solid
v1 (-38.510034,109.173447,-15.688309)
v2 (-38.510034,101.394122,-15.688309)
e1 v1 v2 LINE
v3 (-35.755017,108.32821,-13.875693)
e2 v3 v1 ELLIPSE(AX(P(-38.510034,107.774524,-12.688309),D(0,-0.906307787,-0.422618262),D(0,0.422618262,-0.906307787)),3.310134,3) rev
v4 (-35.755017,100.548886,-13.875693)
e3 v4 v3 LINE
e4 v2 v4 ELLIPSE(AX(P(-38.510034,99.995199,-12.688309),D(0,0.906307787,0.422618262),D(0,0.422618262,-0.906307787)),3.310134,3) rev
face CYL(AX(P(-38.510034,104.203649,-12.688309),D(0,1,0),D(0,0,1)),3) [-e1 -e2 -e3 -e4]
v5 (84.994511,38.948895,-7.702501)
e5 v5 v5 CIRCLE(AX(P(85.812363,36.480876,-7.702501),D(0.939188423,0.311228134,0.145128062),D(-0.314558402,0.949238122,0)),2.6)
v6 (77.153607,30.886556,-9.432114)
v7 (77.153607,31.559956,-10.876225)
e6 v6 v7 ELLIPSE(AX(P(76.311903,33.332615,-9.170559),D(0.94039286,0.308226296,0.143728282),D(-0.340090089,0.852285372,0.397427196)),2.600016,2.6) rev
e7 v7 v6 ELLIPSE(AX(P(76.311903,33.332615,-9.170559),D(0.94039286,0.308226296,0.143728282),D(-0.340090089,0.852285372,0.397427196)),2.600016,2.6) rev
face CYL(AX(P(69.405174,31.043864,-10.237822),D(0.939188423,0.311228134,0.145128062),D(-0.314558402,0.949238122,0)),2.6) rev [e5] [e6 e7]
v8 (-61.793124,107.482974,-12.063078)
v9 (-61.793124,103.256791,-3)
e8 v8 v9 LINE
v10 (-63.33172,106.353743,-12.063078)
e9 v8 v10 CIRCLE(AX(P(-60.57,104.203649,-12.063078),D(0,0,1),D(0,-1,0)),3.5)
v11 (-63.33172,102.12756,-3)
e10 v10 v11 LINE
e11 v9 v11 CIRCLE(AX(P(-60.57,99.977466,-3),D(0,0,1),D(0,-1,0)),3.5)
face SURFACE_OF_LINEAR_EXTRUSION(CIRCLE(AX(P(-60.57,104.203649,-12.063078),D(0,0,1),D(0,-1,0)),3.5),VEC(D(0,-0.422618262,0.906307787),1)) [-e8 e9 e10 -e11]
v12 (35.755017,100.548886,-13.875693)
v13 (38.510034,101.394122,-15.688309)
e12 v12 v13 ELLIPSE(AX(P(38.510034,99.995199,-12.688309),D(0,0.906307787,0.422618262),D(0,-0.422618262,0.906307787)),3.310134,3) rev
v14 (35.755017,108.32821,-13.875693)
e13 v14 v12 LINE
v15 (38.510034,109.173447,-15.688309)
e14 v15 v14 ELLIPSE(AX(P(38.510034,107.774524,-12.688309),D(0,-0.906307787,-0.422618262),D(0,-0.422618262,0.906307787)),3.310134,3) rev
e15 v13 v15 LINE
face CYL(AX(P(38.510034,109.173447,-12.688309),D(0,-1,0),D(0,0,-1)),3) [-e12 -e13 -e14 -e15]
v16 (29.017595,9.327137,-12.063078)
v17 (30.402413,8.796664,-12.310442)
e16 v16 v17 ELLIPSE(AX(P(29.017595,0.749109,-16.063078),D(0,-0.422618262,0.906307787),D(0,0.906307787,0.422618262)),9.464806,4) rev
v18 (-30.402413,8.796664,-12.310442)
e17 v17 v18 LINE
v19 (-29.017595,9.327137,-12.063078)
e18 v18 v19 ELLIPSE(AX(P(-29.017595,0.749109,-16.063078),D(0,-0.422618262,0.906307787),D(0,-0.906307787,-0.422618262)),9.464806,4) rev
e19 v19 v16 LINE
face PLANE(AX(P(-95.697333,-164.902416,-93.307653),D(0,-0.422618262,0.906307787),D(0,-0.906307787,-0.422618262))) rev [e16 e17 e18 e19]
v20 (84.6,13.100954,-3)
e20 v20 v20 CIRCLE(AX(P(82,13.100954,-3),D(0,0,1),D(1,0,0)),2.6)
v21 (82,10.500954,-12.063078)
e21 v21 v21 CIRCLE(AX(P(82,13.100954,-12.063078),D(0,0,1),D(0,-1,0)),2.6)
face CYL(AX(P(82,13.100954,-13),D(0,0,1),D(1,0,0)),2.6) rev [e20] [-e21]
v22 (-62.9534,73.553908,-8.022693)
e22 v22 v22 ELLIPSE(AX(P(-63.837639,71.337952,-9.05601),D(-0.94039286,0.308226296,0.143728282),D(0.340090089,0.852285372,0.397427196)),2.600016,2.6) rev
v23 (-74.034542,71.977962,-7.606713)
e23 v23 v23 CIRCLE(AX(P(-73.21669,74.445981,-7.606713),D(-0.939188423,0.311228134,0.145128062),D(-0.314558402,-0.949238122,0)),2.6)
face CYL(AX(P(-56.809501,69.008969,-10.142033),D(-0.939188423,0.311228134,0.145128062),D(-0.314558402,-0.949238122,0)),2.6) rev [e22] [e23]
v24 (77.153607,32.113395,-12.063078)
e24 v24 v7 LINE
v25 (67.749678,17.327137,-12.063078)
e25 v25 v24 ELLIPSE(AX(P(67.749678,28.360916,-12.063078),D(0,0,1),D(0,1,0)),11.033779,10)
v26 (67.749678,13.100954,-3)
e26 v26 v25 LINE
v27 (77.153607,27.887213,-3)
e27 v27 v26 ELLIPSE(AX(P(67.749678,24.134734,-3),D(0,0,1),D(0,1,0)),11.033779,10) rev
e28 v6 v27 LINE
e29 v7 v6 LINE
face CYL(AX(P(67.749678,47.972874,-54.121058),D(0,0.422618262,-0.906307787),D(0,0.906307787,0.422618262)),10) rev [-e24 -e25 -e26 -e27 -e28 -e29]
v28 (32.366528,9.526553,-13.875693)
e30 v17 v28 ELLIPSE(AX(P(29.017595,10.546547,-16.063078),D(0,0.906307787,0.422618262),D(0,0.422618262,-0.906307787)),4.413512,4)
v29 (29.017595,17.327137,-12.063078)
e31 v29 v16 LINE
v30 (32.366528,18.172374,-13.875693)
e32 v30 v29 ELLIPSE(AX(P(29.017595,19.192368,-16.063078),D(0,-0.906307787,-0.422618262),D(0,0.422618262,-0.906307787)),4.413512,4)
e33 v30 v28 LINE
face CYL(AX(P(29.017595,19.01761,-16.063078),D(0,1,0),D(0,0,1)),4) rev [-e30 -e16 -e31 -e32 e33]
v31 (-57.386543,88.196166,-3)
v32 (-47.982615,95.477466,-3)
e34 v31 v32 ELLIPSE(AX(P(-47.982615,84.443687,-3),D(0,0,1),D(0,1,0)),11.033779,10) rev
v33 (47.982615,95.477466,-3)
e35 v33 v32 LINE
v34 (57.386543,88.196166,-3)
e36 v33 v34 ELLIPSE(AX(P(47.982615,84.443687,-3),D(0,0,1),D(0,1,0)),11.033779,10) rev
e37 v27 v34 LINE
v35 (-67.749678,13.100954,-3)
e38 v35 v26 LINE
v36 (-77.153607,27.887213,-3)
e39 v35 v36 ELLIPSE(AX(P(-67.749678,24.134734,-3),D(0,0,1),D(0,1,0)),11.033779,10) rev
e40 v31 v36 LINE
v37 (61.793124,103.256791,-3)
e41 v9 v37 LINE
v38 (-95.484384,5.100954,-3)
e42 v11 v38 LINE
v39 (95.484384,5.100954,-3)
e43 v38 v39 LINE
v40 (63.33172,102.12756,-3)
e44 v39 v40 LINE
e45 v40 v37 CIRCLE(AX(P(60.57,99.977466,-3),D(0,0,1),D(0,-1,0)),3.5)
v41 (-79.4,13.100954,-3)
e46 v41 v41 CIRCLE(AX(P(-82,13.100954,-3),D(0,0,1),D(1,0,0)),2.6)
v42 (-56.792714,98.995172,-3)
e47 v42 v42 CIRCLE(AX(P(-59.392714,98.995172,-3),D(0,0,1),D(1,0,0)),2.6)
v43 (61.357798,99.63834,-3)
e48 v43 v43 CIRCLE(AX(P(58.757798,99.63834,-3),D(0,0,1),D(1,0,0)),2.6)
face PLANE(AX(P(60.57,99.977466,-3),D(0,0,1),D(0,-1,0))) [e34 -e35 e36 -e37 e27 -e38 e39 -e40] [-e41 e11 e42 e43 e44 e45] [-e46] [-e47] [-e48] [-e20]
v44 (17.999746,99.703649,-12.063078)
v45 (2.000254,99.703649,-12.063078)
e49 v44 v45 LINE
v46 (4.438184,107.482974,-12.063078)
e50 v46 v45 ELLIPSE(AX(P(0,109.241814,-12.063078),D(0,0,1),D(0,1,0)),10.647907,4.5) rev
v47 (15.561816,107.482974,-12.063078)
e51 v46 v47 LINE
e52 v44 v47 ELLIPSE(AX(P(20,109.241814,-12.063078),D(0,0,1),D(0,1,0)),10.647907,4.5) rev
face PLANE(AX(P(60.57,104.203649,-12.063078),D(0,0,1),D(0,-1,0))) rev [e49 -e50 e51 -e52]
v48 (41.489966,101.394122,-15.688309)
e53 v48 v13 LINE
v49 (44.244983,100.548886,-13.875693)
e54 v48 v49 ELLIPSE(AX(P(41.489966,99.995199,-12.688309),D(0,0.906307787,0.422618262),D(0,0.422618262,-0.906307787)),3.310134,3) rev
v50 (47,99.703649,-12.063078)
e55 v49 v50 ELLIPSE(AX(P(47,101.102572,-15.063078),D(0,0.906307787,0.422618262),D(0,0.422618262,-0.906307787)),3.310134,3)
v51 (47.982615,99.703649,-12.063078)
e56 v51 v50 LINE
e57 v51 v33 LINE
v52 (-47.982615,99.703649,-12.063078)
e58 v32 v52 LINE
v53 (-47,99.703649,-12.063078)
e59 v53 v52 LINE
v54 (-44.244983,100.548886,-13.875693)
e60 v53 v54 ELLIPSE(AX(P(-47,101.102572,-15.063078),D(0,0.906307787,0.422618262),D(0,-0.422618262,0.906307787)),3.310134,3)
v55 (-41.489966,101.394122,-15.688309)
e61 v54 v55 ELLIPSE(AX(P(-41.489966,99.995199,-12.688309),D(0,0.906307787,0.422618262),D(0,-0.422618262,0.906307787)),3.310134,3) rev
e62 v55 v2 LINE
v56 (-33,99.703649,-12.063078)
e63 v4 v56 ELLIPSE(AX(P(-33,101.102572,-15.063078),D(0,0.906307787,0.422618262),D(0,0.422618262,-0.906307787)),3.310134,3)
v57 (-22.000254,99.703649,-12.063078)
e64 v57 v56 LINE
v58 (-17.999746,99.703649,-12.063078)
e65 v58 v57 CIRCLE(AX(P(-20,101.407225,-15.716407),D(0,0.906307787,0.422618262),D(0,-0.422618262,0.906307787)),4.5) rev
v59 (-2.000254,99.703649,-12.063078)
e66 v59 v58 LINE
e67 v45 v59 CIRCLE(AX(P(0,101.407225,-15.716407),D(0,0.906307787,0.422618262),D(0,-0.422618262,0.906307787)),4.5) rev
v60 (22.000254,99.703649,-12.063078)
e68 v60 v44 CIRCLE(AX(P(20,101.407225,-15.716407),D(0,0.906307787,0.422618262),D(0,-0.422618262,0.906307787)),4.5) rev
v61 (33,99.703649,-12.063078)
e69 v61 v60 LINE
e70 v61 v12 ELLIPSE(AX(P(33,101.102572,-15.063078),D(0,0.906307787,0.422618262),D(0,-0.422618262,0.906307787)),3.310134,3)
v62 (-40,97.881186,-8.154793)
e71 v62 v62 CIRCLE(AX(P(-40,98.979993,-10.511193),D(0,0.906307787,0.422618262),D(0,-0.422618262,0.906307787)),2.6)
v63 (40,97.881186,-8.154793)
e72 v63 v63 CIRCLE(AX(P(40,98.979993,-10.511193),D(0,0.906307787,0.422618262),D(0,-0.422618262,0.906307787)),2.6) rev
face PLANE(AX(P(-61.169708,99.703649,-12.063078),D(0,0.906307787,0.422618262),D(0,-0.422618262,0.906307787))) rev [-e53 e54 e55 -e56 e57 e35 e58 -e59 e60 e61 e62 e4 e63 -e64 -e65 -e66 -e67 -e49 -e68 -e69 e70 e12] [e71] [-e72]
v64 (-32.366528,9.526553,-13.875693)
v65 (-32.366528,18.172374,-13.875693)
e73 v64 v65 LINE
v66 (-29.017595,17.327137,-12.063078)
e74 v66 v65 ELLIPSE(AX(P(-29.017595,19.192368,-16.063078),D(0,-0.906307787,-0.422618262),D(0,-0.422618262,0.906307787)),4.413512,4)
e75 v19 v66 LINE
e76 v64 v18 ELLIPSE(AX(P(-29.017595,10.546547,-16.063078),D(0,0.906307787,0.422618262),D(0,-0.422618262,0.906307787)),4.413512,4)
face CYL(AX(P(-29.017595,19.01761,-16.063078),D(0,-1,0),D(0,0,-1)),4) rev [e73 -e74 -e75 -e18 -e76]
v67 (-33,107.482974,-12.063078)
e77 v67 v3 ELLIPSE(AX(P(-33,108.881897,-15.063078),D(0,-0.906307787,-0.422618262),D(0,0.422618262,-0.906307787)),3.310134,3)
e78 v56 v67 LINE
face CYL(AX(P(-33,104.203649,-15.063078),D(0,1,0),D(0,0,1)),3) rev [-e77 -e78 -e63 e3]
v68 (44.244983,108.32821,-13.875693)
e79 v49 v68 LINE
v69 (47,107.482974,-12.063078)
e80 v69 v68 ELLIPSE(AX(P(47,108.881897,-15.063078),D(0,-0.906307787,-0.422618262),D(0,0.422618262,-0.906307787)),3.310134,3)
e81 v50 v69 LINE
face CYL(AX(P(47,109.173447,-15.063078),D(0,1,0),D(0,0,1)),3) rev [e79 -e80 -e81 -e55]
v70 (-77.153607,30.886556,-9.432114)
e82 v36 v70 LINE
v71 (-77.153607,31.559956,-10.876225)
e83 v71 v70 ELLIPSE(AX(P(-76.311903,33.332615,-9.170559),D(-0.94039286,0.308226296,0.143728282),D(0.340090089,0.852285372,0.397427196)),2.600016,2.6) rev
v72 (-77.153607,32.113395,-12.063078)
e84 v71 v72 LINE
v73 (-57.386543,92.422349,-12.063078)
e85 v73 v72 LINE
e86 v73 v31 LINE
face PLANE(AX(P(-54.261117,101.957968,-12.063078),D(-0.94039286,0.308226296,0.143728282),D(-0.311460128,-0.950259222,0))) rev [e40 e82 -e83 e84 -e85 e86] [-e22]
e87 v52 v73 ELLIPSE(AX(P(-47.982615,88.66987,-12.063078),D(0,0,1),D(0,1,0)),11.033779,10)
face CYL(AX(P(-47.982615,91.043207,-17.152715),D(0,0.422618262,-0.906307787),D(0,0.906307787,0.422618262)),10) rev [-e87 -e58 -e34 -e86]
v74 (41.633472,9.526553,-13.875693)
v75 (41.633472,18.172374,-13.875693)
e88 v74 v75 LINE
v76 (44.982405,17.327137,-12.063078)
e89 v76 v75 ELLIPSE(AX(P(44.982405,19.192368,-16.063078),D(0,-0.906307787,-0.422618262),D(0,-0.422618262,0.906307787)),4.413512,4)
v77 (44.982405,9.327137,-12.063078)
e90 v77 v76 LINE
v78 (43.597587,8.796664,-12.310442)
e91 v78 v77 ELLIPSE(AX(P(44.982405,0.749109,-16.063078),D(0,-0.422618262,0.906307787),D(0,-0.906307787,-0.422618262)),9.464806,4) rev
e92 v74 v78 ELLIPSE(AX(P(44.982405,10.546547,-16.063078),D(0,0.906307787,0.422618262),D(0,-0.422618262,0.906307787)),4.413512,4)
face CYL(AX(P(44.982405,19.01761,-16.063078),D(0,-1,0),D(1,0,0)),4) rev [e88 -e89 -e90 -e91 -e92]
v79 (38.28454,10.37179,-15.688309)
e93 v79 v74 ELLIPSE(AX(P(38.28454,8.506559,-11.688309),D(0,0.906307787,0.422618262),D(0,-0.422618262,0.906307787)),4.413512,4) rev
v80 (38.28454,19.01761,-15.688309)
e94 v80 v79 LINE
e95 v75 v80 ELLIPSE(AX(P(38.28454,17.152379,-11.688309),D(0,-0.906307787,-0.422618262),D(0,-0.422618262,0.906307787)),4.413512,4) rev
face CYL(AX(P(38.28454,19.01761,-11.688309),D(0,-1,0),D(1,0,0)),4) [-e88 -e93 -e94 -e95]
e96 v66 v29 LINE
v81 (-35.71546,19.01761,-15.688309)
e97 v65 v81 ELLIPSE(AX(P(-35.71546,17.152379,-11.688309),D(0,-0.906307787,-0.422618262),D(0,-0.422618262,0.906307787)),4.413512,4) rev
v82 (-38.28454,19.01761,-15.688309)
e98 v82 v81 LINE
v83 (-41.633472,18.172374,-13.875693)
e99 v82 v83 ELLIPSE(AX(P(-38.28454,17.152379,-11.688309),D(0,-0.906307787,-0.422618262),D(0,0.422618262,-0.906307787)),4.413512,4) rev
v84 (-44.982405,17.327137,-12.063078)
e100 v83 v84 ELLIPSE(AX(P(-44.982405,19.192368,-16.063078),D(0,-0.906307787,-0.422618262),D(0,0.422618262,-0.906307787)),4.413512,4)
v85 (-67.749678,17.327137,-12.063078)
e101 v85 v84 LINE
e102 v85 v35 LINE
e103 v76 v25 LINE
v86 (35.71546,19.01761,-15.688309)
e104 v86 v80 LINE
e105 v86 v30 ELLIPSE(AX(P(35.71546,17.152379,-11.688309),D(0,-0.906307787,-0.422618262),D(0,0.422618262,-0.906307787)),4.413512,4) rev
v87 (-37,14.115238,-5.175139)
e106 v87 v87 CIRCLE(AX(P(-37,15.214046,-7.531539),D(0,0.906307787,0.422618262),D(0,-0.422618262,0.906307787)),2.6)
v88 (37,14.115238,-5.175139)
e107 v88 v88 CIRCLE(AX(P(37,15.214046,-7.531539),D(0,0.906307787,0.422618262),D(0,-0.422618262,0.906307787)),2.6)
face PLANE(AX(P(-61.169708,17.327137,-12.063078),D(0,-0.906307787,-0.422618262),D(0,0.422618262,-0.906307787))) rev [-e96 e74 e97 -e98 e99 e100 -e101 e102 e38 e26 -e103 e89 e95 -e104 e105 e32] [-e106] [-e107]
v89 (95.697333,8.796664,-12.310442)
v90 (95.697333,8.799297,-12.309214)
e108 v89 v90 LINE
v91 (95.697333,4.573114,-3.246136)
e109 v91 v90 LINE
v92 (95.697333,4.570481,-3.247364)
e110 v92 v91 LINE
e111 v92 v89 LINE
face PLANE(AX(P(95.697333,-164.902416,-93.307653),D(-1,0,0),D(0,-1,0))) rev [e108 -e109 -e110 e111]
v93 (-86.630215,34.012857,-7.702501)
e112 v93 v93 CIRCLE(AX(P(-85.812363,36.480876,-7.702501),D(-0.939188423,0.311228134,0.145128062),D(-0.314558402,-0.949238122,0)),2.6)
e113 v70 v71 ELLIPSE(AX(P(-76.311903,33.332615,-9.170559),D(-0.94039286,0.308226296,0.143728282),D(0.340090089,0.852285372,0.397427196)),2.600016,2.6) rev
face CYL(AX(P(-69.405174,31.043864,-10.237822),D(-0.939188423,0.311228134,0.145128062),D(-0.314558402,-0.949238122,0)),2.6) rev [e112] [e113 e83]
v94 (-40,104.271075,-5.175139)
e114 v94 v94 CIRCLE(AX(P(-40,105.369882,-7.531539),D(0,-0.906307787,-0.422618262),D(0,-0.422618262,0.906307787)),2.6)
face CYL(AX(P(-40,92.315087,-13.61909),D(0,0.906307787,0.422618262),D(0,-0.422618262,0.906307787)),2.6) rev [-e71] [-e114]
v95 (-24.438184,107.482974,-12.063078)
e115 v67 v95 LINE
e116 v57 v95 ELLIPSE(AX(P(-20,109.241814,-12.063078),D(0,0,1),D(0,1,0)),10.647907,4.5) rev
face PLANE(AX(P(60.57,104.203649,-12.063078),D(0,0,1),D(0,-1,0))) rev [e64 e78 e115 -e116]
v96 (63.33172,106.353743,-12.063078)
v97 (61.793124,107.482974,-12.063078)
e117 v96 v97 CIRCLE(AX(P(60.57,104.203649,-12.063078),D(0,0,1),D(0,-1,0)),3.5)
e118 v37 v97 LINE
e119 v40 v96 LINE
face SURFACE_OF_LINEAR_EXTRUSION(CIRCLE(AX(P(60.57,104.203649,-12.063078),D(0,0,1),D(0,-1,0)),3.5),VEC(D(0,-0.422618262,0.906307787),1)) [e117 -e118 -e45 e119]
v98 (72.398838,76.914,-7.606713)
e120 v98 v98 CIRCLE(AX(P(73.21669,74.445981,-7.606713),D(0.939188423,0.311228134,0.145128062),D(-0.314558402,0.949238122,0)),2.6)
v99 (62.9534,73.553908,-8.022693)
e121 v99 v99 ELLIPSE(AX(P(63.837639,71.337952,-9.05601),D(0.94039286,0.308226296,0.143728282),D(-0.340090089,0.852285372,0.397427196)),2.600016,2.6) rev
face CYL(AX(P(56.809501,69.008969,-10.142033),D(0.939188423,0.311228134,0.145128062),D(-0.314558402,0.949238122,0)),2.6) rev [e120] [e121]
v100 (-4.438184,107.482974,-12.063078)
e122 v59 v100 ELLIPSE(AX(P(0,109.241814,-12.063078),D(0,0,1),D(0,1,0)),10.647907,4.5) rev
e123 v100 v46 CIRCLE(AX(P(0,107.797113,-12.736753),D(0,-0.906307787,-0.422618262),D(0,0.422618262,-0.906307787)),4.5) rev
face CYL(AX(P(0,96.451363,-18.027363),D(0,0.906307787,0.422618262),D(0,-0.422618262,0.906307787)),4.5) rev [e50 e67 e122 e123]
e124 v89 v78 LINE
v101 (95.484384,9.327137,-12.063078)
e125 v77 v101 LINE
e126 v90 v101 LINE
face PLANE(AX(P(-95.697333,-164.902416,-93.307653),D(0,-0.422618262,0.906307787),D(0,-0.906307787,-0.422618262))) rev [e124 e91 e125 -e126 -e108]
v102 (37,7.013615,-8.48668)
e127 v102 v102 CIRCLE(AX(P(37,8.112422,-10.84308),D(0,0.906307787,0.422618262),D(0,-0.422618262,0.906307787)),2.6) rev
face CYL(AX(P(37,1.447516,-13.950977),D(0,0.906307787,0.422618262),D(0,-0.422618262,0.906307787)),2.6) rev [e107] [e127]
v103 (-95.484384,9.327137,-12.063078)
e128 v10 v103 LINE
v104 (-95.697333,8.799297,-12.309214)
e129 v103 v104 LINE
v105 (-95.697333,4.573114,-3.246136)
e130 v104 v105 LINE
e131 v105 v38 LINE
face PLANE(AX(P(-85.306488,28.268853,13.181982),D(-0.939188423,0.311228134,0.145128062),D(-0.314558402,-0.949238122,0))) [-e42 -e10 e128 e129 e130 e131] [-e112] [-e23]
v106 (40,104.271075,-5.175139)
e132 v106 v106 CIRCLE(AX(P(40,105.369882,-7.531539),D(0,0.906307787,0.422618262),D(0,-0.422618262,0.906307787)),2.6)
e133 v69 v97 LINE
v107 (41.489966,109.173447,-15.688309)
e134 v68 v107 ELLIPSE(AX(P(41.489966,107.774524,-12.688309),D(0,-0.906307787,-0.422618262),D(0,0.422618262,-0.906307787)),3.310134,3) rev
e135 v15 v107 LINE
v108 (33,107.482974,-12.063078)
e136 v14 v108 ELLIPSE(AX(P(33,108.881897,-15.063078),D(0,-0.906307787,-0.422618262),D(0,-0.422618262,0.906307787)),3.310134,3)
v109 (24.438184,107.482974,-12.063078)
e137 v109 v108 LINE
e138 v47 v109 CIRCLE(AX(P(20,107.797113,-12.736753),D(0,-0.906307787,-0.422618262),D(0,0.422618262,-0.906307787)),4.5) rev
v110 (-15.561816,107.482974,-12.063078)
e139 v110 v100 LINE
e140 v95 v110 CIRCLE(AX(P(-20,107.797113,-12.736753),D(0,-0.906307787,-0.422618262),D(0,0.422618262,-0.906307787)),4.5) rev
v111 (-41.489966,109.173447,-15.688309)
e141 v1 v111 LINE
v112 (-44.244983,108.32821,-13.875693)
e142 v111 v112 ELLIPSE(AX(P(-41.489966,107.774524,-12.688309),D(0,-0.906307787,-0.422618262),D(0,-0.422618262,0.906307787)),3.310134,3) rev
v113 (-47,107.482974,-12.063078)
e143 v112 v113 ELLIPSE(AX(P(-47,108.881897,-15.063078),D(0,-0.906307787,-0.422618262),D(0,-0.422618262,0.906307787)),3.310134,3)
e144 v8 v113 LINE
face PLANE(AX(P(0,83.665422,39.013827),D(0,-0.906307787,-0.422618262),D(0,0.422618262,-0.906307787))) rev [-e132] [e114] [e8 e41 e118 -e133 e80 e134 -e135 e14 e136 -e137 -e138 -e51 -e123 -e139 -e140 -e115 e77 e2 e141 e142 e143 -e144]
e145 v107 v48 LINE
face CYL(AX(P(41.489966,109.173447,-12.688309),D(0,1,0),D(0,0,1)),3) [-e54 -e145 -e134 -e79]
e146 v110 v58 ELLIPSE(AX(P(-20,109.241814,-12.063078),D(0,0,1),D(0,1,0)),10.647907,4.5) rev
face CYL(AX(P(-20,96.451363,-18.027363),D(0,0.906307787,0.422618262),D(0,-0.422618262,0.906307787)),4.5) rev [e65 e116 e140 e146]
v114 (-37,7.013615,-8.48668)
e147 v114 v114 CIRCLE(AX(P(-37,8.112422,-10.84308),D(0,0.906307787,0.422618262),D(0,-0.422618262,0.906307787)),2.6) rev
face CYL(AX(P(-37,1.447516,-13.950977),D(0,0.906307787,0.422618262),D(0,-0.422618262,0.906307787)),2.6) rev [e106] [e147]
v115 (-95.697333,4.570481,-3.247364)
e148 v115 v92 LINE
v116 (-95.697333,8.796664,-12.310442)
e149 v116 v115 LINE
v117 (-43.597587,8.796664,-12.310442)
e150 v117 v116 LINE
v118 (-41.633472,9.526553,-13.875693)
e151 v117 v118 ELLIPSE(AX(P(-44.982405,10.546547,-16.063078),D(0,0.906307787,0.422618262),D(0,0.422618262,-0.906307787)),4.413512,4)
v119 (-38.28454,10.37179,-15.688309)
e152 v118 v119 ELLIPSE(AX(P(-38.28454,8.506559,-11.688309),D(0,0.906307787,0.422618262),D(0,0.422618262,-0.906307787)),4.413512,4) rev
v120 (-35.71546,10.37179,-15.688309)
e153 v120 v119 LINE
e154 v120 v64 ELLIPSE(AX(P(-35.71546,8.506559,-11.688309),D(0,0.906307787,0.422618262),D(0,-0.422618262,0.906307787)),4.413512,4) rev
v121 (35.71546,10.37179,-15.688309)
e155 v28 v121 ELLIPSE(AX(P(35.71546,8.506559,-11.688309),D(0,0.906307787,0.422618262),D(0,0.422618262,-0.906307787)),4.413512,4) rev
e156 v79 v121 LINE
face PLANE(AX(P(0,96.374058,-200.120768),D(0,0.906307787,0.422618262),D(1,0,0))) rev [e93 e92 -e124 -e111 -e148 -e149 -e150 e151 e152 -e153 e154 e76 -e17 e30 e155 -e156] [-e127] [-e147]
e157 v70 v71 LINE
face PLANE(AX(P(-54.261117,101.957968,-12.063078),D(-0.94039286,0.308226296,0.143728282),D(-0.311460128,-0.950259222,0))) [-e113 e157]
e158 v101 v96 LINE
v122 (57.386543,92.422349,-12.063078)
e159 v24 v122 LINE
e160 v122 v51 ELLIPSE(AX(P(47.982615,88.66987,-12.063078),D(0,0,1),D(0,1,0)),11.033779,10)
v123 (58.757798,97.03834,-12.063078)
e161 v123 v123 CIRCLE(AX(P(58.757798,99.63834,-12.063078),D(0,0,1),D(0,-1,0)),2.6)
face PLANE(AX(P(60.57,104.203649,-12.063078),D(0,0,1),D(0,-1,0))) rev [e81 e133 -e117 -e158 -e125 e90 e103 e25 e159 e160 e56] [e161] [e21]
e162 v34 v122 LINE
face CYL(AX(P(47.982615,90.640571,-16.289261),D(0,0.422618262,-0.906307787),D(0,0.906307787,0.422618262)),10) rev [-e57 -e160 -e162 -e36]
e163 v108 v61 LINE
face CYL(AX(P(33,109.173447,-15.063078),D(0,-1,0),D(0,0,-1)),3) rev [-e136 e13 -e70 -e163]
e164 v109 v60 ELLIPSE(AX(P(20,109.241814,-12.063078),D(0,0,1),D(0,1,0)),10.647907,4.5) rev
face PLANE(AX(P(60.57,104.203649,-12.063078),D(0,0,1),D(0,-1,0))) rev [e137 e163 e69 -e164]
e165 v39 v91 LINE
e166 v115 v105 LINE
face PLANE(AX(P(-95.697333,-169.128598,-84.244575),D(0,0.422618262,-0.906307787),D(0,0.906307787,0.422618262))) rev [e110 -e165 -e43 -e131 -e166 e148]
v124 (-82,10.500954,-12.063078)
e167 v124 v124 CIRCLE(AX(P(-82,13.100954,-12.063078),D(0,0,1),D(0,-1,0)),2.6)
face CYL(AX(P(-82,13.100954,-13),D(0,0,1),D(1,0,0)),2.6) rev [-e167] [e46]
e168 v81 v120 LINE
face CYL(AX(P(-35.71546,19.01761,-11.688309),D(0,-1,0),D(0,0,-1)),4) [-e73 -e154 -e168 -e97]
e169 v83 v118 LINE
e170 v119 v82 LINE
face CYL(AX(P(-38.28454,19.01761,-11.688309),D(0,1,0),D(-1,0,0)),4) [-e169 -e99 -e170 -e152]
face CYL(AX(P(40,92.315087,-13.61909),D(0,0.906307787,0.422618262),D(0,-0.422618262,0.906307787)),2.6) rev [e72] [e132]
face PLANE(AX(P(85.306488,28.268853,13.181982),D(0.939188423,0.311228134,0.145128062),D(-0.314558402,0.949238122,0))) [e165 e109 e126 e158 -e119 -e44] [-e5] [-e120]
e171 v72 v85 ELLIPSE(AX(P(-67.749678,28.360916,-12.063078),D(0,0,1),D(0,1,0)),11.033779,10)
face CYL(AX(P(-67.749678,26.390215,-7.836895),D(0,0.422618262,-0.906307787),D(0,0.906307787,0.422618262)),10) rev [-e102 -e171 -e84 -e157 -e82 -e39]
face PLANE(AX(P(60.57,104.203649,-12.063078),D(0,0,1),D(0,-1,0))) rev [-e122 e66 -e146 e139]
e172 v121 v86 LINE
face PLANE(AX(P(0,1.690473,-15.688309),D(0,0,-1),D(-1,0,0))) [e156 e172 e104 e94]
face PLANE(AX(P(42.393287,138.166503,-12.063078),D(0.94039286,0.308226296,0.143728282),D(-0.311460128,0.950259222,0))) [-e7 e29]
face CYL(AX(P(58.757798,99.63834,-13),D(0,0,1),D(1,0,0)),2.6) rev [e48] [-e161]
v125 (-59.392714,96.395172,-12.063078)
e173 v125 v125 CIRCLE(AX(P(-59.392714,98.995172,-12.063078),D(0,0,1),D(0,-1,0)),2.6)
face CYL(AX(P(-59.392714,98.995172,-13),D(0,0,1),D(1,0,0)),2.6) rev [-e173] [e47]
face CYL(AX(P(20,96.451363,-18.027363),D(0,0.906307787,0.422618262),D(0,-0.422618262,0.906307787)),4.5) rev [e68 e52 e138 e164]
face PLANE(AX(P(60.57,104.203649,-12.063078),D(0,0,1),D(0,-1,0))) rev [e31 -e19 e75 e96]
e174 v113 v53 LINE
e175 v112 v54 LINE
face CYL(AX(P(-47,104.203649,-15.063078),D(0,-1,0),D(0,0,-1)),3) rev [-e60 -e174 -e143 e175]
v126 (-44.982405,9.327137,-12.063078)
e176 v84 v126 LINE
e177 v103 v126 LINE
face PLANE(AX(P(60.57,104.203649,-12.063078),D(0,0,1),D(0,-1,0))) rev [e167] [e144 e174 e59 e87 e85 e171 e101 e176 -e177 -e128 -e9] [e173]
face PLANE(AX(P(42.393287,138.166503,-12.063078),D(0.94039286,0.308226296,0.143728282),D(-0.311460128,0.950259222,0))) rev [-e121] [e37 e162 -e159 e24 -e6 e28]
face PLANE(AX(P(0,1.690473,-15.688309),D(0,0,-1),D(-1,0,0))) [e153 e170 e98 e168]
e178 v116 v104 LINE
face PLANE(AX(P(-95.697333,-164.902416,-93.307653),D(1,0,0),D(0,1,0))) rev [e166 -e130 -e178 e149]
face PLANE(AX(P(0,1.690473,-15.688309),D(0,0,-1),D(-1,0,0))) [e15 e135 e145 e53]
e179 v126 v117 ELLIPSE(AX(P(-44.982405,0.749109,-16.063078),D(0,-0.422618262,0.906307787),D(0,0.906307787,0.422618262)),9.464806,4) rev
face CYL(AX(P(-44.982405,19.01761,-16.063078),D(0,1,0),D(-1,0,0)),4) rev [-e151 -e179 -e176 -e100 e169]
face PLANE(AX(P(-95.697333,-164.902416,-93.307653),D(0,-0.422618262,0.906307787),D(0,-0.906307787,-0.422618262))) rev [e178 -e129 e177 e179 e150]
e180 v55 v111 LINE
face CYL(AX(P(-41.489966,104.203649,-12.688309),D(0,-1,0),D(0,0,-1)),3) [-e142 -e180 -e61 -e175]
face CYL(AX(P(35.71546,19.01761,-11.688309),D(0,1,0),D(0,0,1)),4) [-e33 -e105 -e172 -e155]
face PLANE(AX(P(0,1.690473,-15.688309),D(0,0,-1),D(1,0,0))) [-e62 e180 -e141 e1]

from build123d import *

# Parameters (mm, degrees)
BOSS_EXTRUDE1_START       = 4.874679861
BOSS_EXTRUDE1_DEPTH       = 51.575710535
BOSS_EXTRUDE1_START_2     = -3.000000017
BOSS_EXTRUDE1_2_OUTLINE_W = 194
BOSS_EXTRUDE1_2_OUTLINE_H = 105
BOSS_EXTRUDE1_2_DEPTH     = 39.000000017
BOSS_EXTRUDE1_START_3     = -51
BOSS_EXTRUDE1_3_OUTLINE_W = 194
BOSS_EXTRUDE1_3_OUTLINE_H = 105
BOSS_EXTRUDE1_3_DEPTH     = 38.936922113
FILLET1_R                 = 10
FILLET2_R                 = 10
FILLET3_R                 = 10
SKETCH3_W                 = 191.394666852
SKETCH3_H                 = 10
BOSS_EXTRUDE2_DEPTH       = 0.585312203
SKETCH4_R                 = 2.6
CUT_EXTRUDE1_DEPTH        = 10
SKETCH7_W                 = 76.681603499
SKETCH7_H                 = 120.522510291
CUT_EXTRUDE3_DEPTH        = 0.2
SKETCH8_W                 = 50.495719576
SKETCH8_H                 = 179.215252444
CUT_EXTRUDE4_DEPTH        = 0.2
SKETCH9_W                 = 172.346517838
SKETCH9_H                 = 32.794681532
CUT_EXTRUDE5_DEPTH        = 0.2
BOSS_EXTRUDE4_START       = -41
BOSS_EXTRUDE4_DEPTH       = 8
BOSS_EXTRUDE4_START_2     = 33
BOSS_EXTRUDE4_2_DEPTH     = 8
BOSS_EXTRUDE6_REACH       = 146.47
SKETCH23_W                = 8
SKETCH23_H                = 6.447128672
SKETCH23_H_2              = 7.052174758
SKETCH25_W                = 94.886099326
SKETCH25_H                = 16.143412247
CUT_EXTRUDE11_DEPTH       = 20
FILLET5_R                 = 4
FILLET7_R                 = 4
SKETCH10_R                = 2.599999996
CUT_EXTRUDE7_DEPTH        = 7.8357745
CUT_EXTRUDE8_REACH        = 201.677
SKETCH12_R                = 2.600000006
CUT_EXTRUDE9_REACH        = 201.677
SKETCH13_R                = 2.599999994
BOSS_EXTRUDE5_START       = 36
BOSS_EXTRUDE5_DEPTH       = 8
FILLET9_R                 = 3
FILLET10_R                = 3
SKETCH15_R                = 2.599999996
CUT_EXTRUDE10_DEPTH       = 7.050462296
FILLET9_OF_MIRROR2_R      = 3
FILLET10_OF_MIRROR2_R     = 3
FILLET11_R                = 4
SKETCH26_R                = 4.5
CUT_EXTRUDE12_DEPTH       = 15


with BuildPart() as part:
    # Boss-Extrude1: read off the stored shape, not the designer's step
    # Boss-Extrude1 outline → Boss-Extrude1 (new body)
    with BuildSketch(Plane(origin=(0, 0, 0), x_dir=(1, 0, 0), z_dir=(0, 0.4226182617407039, -0.9063077870366479)).offset(BOSS_EXTRUDE1_START)):
        with BuildLine():
            Line((95.697333426, -3.355179907), (-95.697333426, -3.355179907))
            Line((-95.697333426, -3.355179907), (-63.892333426, -90.340305173))
            add(Edge.make_bspline(
                [(-60.57, -92.514578876), (-63.097338019, -92.514578876), (-63.892333426, -90.340305173)],
                knots=[3.141592654, 3.141592654, 3.141592654, 4.392397576, 4.392397576, 4.392397576], degree=2, weights=[1, 0.810727575, 1]))
            Line((-60.57, -92.514578876), (60.57, -92.514578876))
            add(Edge.make_bspline(
                [(63.892333426, -90.340305173), (63.097338019, -92.514578876), (60.57, -92.514578876)],
                knots=[1.890787732, 1.890787732, 1.890787732, 3.141592654, 3.141592654, 3.141592654], degree=2, weights=[1, 0.810727575, 1]))
            Line((63.892333426, -90.340305173), (95.697333426, -3.355179907))
        make_face()
        Polygon((55, -85.26411658), (-55, -85.26411658), (-82, -10.605642204), (82, -10.605642204), align=None, mode=Mode.SUBTRACT)
    extrude(amount=BOSS_EXTRUDE1_DEPTH)

    # Boss-Extrude1 2 outline → Boss-Extrude1 2 (cut)
    with BuildSketch(Plane.XY.offset(BOSS_EXTRUDE1_START_2)):
        with Locations((0, 56.5)):
            Rectangle(BOSS_EXTRUDE1_2_OUTLINE_W, BOSS_EXTRUDE1_2_OUTLINE_H)
    extrude(amount=BOSS_EXTRUDE1_2_DEPTH, mode=Mode.SUBTRACT)

    # Boss-Extrude1 3 outline → Boss-Extrude1 3 (cut)
    with BuildSketch(Plane.XY.offset(BOSS_EXTRUDE1_START_3)):
        with Locations((0, 56.5)):
            Rectangle(BOSS_EXTRUDE1_3_OUTLINE_W, BOSS_EXTRUDE1_3_OUTLINE_H)
    extrude(amount=BOSS_EXTRUDE1_3_DEPTH, mode=Mode.SUBTRACT)

    # Fillet1
    fillet1_edges = [part.edges().sort_by_distance(p)[0] for p in [
        (82, 15.214045715, -7.531538952),
    ]]
    fillet(fillet1_edges, radius=FILLET1_R)

    # Fillet2
    fillet2_edges = [part.edges().sort_by_distance(p)[0] for p in [
        (-55, 97.590557805, -7.531538952),
        (-82, 15.214045715, -7.531538952),
    ]]
    fillet(fillet2_edges, radius=FILLET2_R)

    # Fillet3
    fillet3_edges = [part.edges().sort_by_distance(p)[0] for p in [
        (55, 97.590557805, -7.531538952),
    ]]
    fillet(fillet3_edges, radius=FILLET3_R)

    # Sketch3 → Boss-Extrude2 (add)
    with BuildSketch(Plane(origin=(0, 3.040825677, 1.4179603), x_dir=(1, 0, 0), z_dir=(-1.1200309043401983e-15, -0.906307787036648, -0.4226182617407039))):
        with Locations((0, -9.874679861)):
            Rectangle(SKETCH3_W, SKETCH3_H)
    extrude(amount=BOSS_EXTRUDE2_DEPTH)

    # Sketch4 → Cut-Extrude1 (cut)
    with BuildSketch(Plane.XY.offset(-3.000000017)):
        with Locations((82, 13.100954406)):
            Circle(SKETCH4_R)
        with Locations((-82, 13.100954406)):
            Circle(SKETCH4_R)
        with Locations((-59.392713729, 98.995171517)):
            Circle(SKETCH4_R)
        with Locations((58.757797989, 99.638339714)):
            Circle(SKETCH4_R)
    extrude(amount=-CUT_EXTRUDE1_DEPTH, mode=Mode.SUBTRACT)

    # Sketch7 → Cut-Extrude3 (cut)
    with BuildSketch(Plane(origin=(85.494325927, 28.331098282, 13.211008093), x_dir=(0.13776108927123742, 0.04565125132212272, -0.9894128792043928), z_dir=(0.9391884231490254, 0.3112281339441758, 0.1451280622914585))):
        with Locations((19.482436939, 30.359211689)):
            Rectangle(SKETCH7_W, SKETCH7_H)
    extrude(amount=-CUT_EXTRUDE3_DEPTH, mode=Mode.SUBTRACT)

    # Sketch8 → Cut-Extrude4 (cut)
    with BuildSketch(Plane(origin=(-85.494325927, 28.331098282, 13.211008093), x_dir=(0.13776108927124237, -0.045651251322124685, 0.9894128792043921), z_dir=(-0.9391884231490236, 0.3112281339441788, 0.14512806229146383))):
        with Locations((-21.244190838, 22.680558739)):
            Rectangle(SKETCH8_W, SKETCH8_H)
    extrude(amount=-CUT_EXTRUDE4_DEPTH, mode=Mode.SUBTRACT)

    # Sketch9 → Cut-Extrude5 (cut)
    with BuildSketch(Plane(origin=(0, 83.84668325, 39.09835051), x_dir=(1, 0, 0), z_dir=(1.1810911620941561e-15, 0.906307787036648, 0.4226182617407039))):
        with Locations((2.693251026, 51.915992053)):
            Rectangle(SKETCH9_W, SKETCH9_H)
    extrude(amount=-CUT_EXTRUDE5_DEPTH, mode=Mode.SUBTRACT)

    # Boss-Extrude4: read off the stored shape, not the designer's step
    # Boss-Extrude4 outline → Boss-Extrude4 (add)
    with BuildSketch(Plane.YZ.offset(BOSS_EXTRUDE4_START)):
        Polygon((9.327137023, -12.063077887), (11.01761007, -15.688309035), (19.01761007, -15.688309035), (17.327137023, -12.063077887), align=None)
    extrude(amount=BOSS_EXTRUDE4_DEPTH)

    # Boss-Extrude4 2 outline → Boss-Extrude4 2 (add)
    with BuildSketch(Plane.YZ.offset(BOSS_EXTRUDE4_START_2)):
        Polygon((9.327137023, -12.063077887), (11.01761007, -15.688309035), (19.01761007, -15.688309035), (17.327137023, -12.063077887), align=None)
    extrude(amount=BOSS_EXTRUDE4_2_DEPTH)

    # Boss-Extrude6: up to this plane
    boss_extrude6_end = Plane(origin=(-95.697333426, -164.902415704, -93.307652601), z_dir=(0, -0.4226182617407038, 0.9063077870366479))
    # Sketch23 → Boss-Extrude6 (add, up to the surface)
    with BuildSketch(Plane(origin=(0, 0, -15.688309035), x_dir=(-1, 0, 0), z_dir=(0, 0, -1)), mode=Mode.PRIVATE) as boss_extrude6_sk1:
        with Locations((-37, 7.794045734)):
            Rectangle(SKETCH23_W, SKETCH23_H)
    boss_extrude6_tool1 = split(extrude(boss_extrude6_sk1.sketch, amount=-BOSS_EXTRUDE6_REACH, mode=Mode.PRIVATE), bisect_by=boss_extrude6_end, keep=Keep.BOTH, mode=Mode.PRIVATE)
    add(boss_extrude6_tool1.solids().sort_by_distance((37, 7.794046, -15.688309))[0])
    # Sketch23 → Boss-Extrude6 (add, up to the surface)
    with BuildSketch(Plane(origin=(0, 0, -15.688309035), x_dir=(-1, 0, 0), z_dir=(0, 0, -1)), mode=Mode.PRIVATE) as boss_extrude6_sk2:
        with Locations((37, 7.491522691)):
            Rectangle(SKETCH23_W, SKETCH23_H_2)
    boss_extrude6_tool2 = split(extrude(boss_extrude6_sk2.sketch, amount=-BOSS_EXTRUDE6_REACH, mode=Mode.PRIVATE), bisect_by=boss_extrude6_end, keep=Keep.BOTH, mode=Mode.PRIVATE)
    add(boss_extrude6_tool2.solids().sort_by_distance((-37, 7.491523, -15.688309))[0])

    # Sketch25 → Cut-Extrude11 (cut)
    with BuildSketch(Plane(origin=(0, 2.510352669, 1.170596674), x_dir=(1, 0, 0), z_dir=(-1.039808498602085e-15, -0.9063077870366479, -0.42261826174070405))):
        with Locations((2.401661721, -17.291874028)):
            Rectangle(SKETCH25_W, SKETCH25_H)
    extrude(amount=CUT_EXTRUDE11_DEPTH, mode=Mode.SUBTRACT)

    # Fillet5
    # the kernel refuses this fillet: 4 mm, written as the material it adds along each edge
    with BuildSketch(Plane(origin=(33, 27.283149122, -12.063077887), x_dir=(0, 0, -1), z_dir=(0, -1, 0))) as fillet5_piece_1_section:
        with BuildLine():
            CenterArc((4, -3.98240484), FILLET5_R, 95.376053402, 84.623946598)
            Line((0, -3.98240484), (0, 0))
            Line((0, 0), (3.625231148, 0))
        make_face()
    fillet5_piece_1 = extrude(amount=27.912024199, mode=Mode.PRIVATE)
    fillet5_piece_1 = split(fillet5_piece_1, bisect_by=Plane(origin=(33, 12.003719017, -19.187993157), z_dir=(1.1200309043401985e-15, 0.906307787036648, 0.4226182617407039)), keep=Keep.TOP, mode=Mode.PRIVATE)
    fillet5_piece_1 = split(fillet5_piece_1, bisect_by=Plane(origin=(33, 19.105342463, -15.876451759), z_dir=(0, -0.9063077870265417, -0.42261826176237693)), keep=Keep.TOP, mode=Mode.PRIVATE)
    add(fillet5_piece_1)

    # Fillet7
    # the kernel refuses this fillet: 4 mm, written as the material it adds along each edge
    with BuildSketch(Plane(origin=(-41, 27.283149122, -12.063077887), x_dir=(-1, 0, 0), z_dir=(0, -1, 0))) as fillet7_piece_1_section:
        with BuildLine():
            CenterArc((3.98240484, 4), FILLET7_R, 185.376053402, 84.623946598)
            Line((0, 3.625231148), (0, 0))
            Line((0, 0), (3.98240484, 0))
        make_face()
    fillet7_piece_1 = extrude(amount=27.912024199, mode=Mode.PRIVATE)
    fillet7_piece_1 = split(fillet7_piece_1, bisect_by=Plane(origin=(-41, 12.003719017, -19.187993157), z_dir=(0, 0.9063077870365974, 0.42261826174081224)), keep=Keep.TOP, mode=Mode.PRIVATE)
    fillet7_piece_1 = split(fillet7_piece_1, bisect_by=Plane(origin=(-41, 19.105342464, -15.876451759), z_dir=(0, -0.9063077870366479, -0.4226182617407039)), keep=Keep.TOP, mode=Mode.PRIVATE)
    add(fillet7_piece_1)
    with BuildSketch(Plane(origin=(-33, -0.628875076, -12.063077887), x_dir=(1, 0, 0), z_dir=(0, 1, 0))) as fillet7_piece_2_section:
        with BuildLine():
            CenterArc((3.98240484, 4), FILLET7_R, 185.376053402, 84.623946598)
            Line((0, 3.625231148), (0, 0))
            Line((0, 0), (3.98240484, 0))
        make_face()
    fillet7_piece_2 = extrude(amount=27.912024199, mode=Mode.PRIVATE)
    fillet7_piece_2 = split(fillet7_piece_2, bisect_by=Plane(origin=(-33, 7.018458576, -8.49706764), z_dir=(0, 0.9063077870365974, 0.42261826174081224)), keep=Keep.TOP, mode=Mode.PRIVATE)
    fillet7_piece_2 = split(fillet7_piece_2, bisect_by=Plane(origin=(-33, 14.120082023, -5.185526242), z_dir=(0, -0.9063077870366479, -0.4226182617407039)), keep=Keep.TOP, mode=Mode.PRIVATE)
    add(fillet7_piece_2)
    with BuildSketch(Plane(origin=(41, -0.628875076, -12.063077887), x_dir=(0, 0, -1), z_dir=(0, 1, 0))) as fillet7_piece_3_section:
        with BuildLine():
            CenterArc((4, -3.98240484), FILLET7_R, 95.376053402, 84.623946598)
            Line((0, -3.98240484), (0, 0))
            Line((0, 0), (3.625231148, 0))
        make_face()
    fillet7_piece_3 = extrude(amount=27.912024199, mode=Mode.PRIVATE)
    fillet7_piece_3 = split(fillet7_piece_3, bisect_by=Plane(origin=(41, 14.120082021, -5.185526242), z_dir=(0, -0.906307787026768, -0.4226182617618918)), keep=Keep.TOP, mode=Mode.PRIVATE)
    fillet7_piece_3 = split(fillet7_piece_3, bisect_by=Plane(origin=(41, 7.018458576, -8.49706764), z_dir=(0, 0.9063077870365974, 0.42261826174081224)), keep=Keep.TOP, mode=Mode.PRIVATE)
    add(fillet7_piece_3)

    # Sketch10 → Cut-Extrude7 (cut)
    with BuildSketch(Plane(origin=(0, 9.611976116, 4.482138073), x_dir=(1, 0, 0), z_dir=(0, 0.906307787036648, 0.4226182617407039))):
        with Locations(Location((37, 13.255625955, 0), (0, 0, 270))):
            Circle(SKETCH10_R)
        with Locations(Location((-37, 13.255625955, 0), (0, 0, 270))):
            Circle(SKETCH10_R)
    extrude(amount=-CUT_EXTRUDE7_DEPTH, mode=Mode.SUBTRACT)

    # Cut-Extrude8: up to this plane
    cut_extrude8_end = Plane(origin=(-54.261116971, 101.957967882, -12.063077887), z_dir=(-0.9403928599993537, 0.30822629625609715, 0.1437282823889735))
    # Sketch12 → Cut-Extrude8 (cut, up to the surface)
    with BuildSketch(Plane(origin=(-85.306488243, 28.268852655, 13.18198248), x_dir=(0.13776108927124261, -0.04565125132212473, 0.989412879204392), z_dir=(-0.9391884231490243, 0.3112281339441767, 0.14512806229146408)), mode=Mode.PRIVATE) as cut_extrude8_sk1:
        with Locations(Location((-21.011142762, 47.636038184, 0), (0, 0, 270))):
            Circle(SKETCH12_R)
    cut_extrude8_tool1 = split(extrude(cut_extrude8_sk1.sketch, amount=-CUT_EXTRUDE8_REACH, mode=Mode.PRIVATE), bisect_by=cut_extrude8_end, keep=Keep.BOTH, mode=Mode.PRIVATE)
    add(cut_extrude8_tool1.solids().sort_by_distance((-73.21669, 74.445981, -7.606713))[0], mode=Mode.SUBTRACT)
    # Sketch12 → Cut-Extrude8 (cut, up to the surface)
    with BuildSketch(Plane(origin=(-85.306488243, 28.268852655, 13.18198248), x_dir=(0.13776108927124261, -0.04565125132212473, 0.989412879204392), z_dir=(-0.9391884231490243, 0.3112281339441767, 0.14512806229146408)), mode=Mode.PRIVATE) as cut_extrude8_sk2:
        with Locations(Location((-21.107956078, 7.636038184, 0), (0, 0, 270))):
            Circle(SKETCH12_R)
    cut_extrude8_tool2 = split(extrude(cut_extrude8_sk2.sketch, amount=-CUT_EXTRUDE8_REACH, mode=Mode.PRIVATE), bisect_by=cut_extrude8_end, keep=Keep.BOTH, mode=Mode.PRIVATE)
    add(cut_extrude8_tool2.solids().sort_by_distance((-85.812363, 36.480876, -7.702501))[0], mode=Mode.SUBTRACT)

    # Cut-Extrude9: up to this plane
    cut_extrude9_end = Plane(origin=(42.393286839, 138.166503154, -12.063077887), z_dir=(0.9403928599993542, 0.308226296256098, 0.1437282823889695))
    # Sketch13 → Cut-Extrude9 (cut, up to the surface)
    with BuildSketch(Plane(origin=(85.306488243, 28.268852655, 13.18198248), x_dir=(0.1377610892712373, 0.045651251322122756, -0.989412879204393), z_dir=(0.9391884231490254, 0.3112281339441758, 0.1451280622914584)), mode=Mode.PRIVATE) as cut_extrude9_sk1:
        with Locations(Location((21.011142762, 47.636038184, 0), (0, 0, 90))):
            Circle(SKETCH13_R)
    cut_extrude9_tool1 = split(extrude(cut_extrude9_sk1.sketch, amount=-CUT_EXTRUDE9_REACH, mode=Mode.PRIVATE), bisect_by=cut_extrude9_end, keep=Keep.BOTH, mode=Mode.PRIVATE)
    add(cut_extrude9_tool1.solids().sort_by_distance((73.21669, 74.445981, -7.606713))[0], mode=Mode.SUBTRACT)
    # Sketch13 → Cut-Extrude9 (cut, up to the surface)
    with BuildSketch(Plane(origin=(85.306488243, 28.268852655, 13.18198248), x_dir=(0.1377610892712373, 0.045651251322122756, -0.989412879204393), z_dir=(0.9391884231490254, 0.3112281339441758, 0.1451280622914584)), mode=Mode.PRIVATE) as cut_extrude9_sk2:
        with Locations(Location((21.107956078, 7.636038184, 0), (0, 0, 90))):
            Circle(SKETCH13_R)
    cut_extrude9_tool2 = split(extrude(cut_extrude9_sk2.sketch, amount=-CUT_EXTRUDE9_REACH, mode=Mode.PRIVATE), bisect_by=cut_extrude9_end, keep=Keep.BOTH, mode=Mode.PRIVATE)
    add(cut_extrude9_tool2.solids().sort_by_distance((85.812363, 36.480876, -7.702501))[0], mode=Mode.SUBTRACT)

    # Boss-Extrude5: read off the stored shape, not the designer's step
    # Boss-Extrude5 outline → Boss-Extrude5 (add)
    with BuildSketch(Plane.YZ.offset(BOSS_EXTRUDE5_START)):
        Polygon((99.703649113, -12.063077887), (101.39412216, -15.688309035), (109.173446577, -15.688309035), (107.48297353, -12.063077887), align=None)
    boss_extrude5 = extrude(amount=BOSS_EXTRUDE5_DEPTH)

    # Fillet9
    fillet9_edges = [part.edges().sort_by_distance(p)[0] for p in [
        (44, 103.593311321, -12.063077887),
        (36, 103.593311321, -12.063077887),
    ]]
    fillet(fillet9_edges, radius=FILLET9_R)

    # Fillet10
    fillet10_edges = [part.edges().sort_by_distance(p)[0] for p in [
        (36, 105.283784368, -15.688309035),
        (44, 105.283784368, -15.688309035),
    ]]
    fillet(fillet10_edges, radius=FILLET10_R)

    # Sketch15 → Cut-Extrude10 (cut)
    with BuildSketch(Plane(origin=(0, 83.665421692, 39.013826858), x_dir=(1, 0, 0), z_dir=(1.1528991411886154e-15, 0.906307787036648, 0.4226182617407039))):
        with Locations(Location((40, 51.357128865, 0), (0, 0, 270))):
            Circle(SKETCH15_R)
    cut_extrude10 = extrude(amount=-CUT_EXTRUDE10_DEPTH, mode=Mode.SUBTRACT)

    # Mirror2: Boss-Extrude5, Cut-Extrude10 across plane
    add(boss_extrude5.mirror(Plane(origin=(0, 0, 0), x_dir=(0, 0, 1), z_dir=(1, 0, 0))))
    add(cut_extrude10.mirror(Plane(origin=(0, 0, 0), x_dir=(0, 0, 1), z_dir=(1, 0, 0))), mode=Mode.SUBTRACT)

    # Fillet9 of Mirror2
    fillet9_of_mirror2_edges = [part.edges().sort_by_distance(p)[0] for p in [
        (-44, 103.593311321, -12.063077887),
        (-36, 103.593311321, -12.063077887),
    ]]
    fillet(fillet9_of_mirror2_edges, radius=FILLET9_OF_MIRROR2_R)

    # Fillet10 of Mirror2
    fillet10_of_mirror2_edges = [part.edges().sort_by_distance(p)[0] for p in [
        (-36, 105.283784368, -15.688309035),
        (-44, 105.283784368, -15.688309035),
    ]]
    fillet(fillet10_of_mirror2_edges, radius=FILLET10_OF_MIRROR2_R)

    # Fillet11
    fillet11_edges = [part.edges().sort_by_distance(p)[0] for p in [
        (-41, 15.01761007, -15.688309035),
        (-33, 15.01761007, -15.688309035),
        (41, 15.01761007, -15.688309035),
        (33, 15.01761007, -15.688309035),
    ]]
    fillet(fillet11_edges, radius=FILLET11_R)

    # Sketch26 → Cut-Extrude12 (cut)
    with BuildSketch(Plane(origin=(0, 85.91428785, 40.062490369), x_dir=(1, 0, 0), z_dir=(-1.039808498602085e-15, -0.9063077870366479, -0.42261826174070405))):
        with Locations((-20, -57.100447132)):
            Circle(SKETCH26_R)
        with Locations((0, -57.100447132)):
            Circle(SKETCH26_R)
        with Locations((20, -57.100447132)):
            Circle(SKETCH26_R)
    extrude(amount=CUT_EXTRUDE12_DEPTH, mode=Mode.SUBTRACT)


solid = part.part
